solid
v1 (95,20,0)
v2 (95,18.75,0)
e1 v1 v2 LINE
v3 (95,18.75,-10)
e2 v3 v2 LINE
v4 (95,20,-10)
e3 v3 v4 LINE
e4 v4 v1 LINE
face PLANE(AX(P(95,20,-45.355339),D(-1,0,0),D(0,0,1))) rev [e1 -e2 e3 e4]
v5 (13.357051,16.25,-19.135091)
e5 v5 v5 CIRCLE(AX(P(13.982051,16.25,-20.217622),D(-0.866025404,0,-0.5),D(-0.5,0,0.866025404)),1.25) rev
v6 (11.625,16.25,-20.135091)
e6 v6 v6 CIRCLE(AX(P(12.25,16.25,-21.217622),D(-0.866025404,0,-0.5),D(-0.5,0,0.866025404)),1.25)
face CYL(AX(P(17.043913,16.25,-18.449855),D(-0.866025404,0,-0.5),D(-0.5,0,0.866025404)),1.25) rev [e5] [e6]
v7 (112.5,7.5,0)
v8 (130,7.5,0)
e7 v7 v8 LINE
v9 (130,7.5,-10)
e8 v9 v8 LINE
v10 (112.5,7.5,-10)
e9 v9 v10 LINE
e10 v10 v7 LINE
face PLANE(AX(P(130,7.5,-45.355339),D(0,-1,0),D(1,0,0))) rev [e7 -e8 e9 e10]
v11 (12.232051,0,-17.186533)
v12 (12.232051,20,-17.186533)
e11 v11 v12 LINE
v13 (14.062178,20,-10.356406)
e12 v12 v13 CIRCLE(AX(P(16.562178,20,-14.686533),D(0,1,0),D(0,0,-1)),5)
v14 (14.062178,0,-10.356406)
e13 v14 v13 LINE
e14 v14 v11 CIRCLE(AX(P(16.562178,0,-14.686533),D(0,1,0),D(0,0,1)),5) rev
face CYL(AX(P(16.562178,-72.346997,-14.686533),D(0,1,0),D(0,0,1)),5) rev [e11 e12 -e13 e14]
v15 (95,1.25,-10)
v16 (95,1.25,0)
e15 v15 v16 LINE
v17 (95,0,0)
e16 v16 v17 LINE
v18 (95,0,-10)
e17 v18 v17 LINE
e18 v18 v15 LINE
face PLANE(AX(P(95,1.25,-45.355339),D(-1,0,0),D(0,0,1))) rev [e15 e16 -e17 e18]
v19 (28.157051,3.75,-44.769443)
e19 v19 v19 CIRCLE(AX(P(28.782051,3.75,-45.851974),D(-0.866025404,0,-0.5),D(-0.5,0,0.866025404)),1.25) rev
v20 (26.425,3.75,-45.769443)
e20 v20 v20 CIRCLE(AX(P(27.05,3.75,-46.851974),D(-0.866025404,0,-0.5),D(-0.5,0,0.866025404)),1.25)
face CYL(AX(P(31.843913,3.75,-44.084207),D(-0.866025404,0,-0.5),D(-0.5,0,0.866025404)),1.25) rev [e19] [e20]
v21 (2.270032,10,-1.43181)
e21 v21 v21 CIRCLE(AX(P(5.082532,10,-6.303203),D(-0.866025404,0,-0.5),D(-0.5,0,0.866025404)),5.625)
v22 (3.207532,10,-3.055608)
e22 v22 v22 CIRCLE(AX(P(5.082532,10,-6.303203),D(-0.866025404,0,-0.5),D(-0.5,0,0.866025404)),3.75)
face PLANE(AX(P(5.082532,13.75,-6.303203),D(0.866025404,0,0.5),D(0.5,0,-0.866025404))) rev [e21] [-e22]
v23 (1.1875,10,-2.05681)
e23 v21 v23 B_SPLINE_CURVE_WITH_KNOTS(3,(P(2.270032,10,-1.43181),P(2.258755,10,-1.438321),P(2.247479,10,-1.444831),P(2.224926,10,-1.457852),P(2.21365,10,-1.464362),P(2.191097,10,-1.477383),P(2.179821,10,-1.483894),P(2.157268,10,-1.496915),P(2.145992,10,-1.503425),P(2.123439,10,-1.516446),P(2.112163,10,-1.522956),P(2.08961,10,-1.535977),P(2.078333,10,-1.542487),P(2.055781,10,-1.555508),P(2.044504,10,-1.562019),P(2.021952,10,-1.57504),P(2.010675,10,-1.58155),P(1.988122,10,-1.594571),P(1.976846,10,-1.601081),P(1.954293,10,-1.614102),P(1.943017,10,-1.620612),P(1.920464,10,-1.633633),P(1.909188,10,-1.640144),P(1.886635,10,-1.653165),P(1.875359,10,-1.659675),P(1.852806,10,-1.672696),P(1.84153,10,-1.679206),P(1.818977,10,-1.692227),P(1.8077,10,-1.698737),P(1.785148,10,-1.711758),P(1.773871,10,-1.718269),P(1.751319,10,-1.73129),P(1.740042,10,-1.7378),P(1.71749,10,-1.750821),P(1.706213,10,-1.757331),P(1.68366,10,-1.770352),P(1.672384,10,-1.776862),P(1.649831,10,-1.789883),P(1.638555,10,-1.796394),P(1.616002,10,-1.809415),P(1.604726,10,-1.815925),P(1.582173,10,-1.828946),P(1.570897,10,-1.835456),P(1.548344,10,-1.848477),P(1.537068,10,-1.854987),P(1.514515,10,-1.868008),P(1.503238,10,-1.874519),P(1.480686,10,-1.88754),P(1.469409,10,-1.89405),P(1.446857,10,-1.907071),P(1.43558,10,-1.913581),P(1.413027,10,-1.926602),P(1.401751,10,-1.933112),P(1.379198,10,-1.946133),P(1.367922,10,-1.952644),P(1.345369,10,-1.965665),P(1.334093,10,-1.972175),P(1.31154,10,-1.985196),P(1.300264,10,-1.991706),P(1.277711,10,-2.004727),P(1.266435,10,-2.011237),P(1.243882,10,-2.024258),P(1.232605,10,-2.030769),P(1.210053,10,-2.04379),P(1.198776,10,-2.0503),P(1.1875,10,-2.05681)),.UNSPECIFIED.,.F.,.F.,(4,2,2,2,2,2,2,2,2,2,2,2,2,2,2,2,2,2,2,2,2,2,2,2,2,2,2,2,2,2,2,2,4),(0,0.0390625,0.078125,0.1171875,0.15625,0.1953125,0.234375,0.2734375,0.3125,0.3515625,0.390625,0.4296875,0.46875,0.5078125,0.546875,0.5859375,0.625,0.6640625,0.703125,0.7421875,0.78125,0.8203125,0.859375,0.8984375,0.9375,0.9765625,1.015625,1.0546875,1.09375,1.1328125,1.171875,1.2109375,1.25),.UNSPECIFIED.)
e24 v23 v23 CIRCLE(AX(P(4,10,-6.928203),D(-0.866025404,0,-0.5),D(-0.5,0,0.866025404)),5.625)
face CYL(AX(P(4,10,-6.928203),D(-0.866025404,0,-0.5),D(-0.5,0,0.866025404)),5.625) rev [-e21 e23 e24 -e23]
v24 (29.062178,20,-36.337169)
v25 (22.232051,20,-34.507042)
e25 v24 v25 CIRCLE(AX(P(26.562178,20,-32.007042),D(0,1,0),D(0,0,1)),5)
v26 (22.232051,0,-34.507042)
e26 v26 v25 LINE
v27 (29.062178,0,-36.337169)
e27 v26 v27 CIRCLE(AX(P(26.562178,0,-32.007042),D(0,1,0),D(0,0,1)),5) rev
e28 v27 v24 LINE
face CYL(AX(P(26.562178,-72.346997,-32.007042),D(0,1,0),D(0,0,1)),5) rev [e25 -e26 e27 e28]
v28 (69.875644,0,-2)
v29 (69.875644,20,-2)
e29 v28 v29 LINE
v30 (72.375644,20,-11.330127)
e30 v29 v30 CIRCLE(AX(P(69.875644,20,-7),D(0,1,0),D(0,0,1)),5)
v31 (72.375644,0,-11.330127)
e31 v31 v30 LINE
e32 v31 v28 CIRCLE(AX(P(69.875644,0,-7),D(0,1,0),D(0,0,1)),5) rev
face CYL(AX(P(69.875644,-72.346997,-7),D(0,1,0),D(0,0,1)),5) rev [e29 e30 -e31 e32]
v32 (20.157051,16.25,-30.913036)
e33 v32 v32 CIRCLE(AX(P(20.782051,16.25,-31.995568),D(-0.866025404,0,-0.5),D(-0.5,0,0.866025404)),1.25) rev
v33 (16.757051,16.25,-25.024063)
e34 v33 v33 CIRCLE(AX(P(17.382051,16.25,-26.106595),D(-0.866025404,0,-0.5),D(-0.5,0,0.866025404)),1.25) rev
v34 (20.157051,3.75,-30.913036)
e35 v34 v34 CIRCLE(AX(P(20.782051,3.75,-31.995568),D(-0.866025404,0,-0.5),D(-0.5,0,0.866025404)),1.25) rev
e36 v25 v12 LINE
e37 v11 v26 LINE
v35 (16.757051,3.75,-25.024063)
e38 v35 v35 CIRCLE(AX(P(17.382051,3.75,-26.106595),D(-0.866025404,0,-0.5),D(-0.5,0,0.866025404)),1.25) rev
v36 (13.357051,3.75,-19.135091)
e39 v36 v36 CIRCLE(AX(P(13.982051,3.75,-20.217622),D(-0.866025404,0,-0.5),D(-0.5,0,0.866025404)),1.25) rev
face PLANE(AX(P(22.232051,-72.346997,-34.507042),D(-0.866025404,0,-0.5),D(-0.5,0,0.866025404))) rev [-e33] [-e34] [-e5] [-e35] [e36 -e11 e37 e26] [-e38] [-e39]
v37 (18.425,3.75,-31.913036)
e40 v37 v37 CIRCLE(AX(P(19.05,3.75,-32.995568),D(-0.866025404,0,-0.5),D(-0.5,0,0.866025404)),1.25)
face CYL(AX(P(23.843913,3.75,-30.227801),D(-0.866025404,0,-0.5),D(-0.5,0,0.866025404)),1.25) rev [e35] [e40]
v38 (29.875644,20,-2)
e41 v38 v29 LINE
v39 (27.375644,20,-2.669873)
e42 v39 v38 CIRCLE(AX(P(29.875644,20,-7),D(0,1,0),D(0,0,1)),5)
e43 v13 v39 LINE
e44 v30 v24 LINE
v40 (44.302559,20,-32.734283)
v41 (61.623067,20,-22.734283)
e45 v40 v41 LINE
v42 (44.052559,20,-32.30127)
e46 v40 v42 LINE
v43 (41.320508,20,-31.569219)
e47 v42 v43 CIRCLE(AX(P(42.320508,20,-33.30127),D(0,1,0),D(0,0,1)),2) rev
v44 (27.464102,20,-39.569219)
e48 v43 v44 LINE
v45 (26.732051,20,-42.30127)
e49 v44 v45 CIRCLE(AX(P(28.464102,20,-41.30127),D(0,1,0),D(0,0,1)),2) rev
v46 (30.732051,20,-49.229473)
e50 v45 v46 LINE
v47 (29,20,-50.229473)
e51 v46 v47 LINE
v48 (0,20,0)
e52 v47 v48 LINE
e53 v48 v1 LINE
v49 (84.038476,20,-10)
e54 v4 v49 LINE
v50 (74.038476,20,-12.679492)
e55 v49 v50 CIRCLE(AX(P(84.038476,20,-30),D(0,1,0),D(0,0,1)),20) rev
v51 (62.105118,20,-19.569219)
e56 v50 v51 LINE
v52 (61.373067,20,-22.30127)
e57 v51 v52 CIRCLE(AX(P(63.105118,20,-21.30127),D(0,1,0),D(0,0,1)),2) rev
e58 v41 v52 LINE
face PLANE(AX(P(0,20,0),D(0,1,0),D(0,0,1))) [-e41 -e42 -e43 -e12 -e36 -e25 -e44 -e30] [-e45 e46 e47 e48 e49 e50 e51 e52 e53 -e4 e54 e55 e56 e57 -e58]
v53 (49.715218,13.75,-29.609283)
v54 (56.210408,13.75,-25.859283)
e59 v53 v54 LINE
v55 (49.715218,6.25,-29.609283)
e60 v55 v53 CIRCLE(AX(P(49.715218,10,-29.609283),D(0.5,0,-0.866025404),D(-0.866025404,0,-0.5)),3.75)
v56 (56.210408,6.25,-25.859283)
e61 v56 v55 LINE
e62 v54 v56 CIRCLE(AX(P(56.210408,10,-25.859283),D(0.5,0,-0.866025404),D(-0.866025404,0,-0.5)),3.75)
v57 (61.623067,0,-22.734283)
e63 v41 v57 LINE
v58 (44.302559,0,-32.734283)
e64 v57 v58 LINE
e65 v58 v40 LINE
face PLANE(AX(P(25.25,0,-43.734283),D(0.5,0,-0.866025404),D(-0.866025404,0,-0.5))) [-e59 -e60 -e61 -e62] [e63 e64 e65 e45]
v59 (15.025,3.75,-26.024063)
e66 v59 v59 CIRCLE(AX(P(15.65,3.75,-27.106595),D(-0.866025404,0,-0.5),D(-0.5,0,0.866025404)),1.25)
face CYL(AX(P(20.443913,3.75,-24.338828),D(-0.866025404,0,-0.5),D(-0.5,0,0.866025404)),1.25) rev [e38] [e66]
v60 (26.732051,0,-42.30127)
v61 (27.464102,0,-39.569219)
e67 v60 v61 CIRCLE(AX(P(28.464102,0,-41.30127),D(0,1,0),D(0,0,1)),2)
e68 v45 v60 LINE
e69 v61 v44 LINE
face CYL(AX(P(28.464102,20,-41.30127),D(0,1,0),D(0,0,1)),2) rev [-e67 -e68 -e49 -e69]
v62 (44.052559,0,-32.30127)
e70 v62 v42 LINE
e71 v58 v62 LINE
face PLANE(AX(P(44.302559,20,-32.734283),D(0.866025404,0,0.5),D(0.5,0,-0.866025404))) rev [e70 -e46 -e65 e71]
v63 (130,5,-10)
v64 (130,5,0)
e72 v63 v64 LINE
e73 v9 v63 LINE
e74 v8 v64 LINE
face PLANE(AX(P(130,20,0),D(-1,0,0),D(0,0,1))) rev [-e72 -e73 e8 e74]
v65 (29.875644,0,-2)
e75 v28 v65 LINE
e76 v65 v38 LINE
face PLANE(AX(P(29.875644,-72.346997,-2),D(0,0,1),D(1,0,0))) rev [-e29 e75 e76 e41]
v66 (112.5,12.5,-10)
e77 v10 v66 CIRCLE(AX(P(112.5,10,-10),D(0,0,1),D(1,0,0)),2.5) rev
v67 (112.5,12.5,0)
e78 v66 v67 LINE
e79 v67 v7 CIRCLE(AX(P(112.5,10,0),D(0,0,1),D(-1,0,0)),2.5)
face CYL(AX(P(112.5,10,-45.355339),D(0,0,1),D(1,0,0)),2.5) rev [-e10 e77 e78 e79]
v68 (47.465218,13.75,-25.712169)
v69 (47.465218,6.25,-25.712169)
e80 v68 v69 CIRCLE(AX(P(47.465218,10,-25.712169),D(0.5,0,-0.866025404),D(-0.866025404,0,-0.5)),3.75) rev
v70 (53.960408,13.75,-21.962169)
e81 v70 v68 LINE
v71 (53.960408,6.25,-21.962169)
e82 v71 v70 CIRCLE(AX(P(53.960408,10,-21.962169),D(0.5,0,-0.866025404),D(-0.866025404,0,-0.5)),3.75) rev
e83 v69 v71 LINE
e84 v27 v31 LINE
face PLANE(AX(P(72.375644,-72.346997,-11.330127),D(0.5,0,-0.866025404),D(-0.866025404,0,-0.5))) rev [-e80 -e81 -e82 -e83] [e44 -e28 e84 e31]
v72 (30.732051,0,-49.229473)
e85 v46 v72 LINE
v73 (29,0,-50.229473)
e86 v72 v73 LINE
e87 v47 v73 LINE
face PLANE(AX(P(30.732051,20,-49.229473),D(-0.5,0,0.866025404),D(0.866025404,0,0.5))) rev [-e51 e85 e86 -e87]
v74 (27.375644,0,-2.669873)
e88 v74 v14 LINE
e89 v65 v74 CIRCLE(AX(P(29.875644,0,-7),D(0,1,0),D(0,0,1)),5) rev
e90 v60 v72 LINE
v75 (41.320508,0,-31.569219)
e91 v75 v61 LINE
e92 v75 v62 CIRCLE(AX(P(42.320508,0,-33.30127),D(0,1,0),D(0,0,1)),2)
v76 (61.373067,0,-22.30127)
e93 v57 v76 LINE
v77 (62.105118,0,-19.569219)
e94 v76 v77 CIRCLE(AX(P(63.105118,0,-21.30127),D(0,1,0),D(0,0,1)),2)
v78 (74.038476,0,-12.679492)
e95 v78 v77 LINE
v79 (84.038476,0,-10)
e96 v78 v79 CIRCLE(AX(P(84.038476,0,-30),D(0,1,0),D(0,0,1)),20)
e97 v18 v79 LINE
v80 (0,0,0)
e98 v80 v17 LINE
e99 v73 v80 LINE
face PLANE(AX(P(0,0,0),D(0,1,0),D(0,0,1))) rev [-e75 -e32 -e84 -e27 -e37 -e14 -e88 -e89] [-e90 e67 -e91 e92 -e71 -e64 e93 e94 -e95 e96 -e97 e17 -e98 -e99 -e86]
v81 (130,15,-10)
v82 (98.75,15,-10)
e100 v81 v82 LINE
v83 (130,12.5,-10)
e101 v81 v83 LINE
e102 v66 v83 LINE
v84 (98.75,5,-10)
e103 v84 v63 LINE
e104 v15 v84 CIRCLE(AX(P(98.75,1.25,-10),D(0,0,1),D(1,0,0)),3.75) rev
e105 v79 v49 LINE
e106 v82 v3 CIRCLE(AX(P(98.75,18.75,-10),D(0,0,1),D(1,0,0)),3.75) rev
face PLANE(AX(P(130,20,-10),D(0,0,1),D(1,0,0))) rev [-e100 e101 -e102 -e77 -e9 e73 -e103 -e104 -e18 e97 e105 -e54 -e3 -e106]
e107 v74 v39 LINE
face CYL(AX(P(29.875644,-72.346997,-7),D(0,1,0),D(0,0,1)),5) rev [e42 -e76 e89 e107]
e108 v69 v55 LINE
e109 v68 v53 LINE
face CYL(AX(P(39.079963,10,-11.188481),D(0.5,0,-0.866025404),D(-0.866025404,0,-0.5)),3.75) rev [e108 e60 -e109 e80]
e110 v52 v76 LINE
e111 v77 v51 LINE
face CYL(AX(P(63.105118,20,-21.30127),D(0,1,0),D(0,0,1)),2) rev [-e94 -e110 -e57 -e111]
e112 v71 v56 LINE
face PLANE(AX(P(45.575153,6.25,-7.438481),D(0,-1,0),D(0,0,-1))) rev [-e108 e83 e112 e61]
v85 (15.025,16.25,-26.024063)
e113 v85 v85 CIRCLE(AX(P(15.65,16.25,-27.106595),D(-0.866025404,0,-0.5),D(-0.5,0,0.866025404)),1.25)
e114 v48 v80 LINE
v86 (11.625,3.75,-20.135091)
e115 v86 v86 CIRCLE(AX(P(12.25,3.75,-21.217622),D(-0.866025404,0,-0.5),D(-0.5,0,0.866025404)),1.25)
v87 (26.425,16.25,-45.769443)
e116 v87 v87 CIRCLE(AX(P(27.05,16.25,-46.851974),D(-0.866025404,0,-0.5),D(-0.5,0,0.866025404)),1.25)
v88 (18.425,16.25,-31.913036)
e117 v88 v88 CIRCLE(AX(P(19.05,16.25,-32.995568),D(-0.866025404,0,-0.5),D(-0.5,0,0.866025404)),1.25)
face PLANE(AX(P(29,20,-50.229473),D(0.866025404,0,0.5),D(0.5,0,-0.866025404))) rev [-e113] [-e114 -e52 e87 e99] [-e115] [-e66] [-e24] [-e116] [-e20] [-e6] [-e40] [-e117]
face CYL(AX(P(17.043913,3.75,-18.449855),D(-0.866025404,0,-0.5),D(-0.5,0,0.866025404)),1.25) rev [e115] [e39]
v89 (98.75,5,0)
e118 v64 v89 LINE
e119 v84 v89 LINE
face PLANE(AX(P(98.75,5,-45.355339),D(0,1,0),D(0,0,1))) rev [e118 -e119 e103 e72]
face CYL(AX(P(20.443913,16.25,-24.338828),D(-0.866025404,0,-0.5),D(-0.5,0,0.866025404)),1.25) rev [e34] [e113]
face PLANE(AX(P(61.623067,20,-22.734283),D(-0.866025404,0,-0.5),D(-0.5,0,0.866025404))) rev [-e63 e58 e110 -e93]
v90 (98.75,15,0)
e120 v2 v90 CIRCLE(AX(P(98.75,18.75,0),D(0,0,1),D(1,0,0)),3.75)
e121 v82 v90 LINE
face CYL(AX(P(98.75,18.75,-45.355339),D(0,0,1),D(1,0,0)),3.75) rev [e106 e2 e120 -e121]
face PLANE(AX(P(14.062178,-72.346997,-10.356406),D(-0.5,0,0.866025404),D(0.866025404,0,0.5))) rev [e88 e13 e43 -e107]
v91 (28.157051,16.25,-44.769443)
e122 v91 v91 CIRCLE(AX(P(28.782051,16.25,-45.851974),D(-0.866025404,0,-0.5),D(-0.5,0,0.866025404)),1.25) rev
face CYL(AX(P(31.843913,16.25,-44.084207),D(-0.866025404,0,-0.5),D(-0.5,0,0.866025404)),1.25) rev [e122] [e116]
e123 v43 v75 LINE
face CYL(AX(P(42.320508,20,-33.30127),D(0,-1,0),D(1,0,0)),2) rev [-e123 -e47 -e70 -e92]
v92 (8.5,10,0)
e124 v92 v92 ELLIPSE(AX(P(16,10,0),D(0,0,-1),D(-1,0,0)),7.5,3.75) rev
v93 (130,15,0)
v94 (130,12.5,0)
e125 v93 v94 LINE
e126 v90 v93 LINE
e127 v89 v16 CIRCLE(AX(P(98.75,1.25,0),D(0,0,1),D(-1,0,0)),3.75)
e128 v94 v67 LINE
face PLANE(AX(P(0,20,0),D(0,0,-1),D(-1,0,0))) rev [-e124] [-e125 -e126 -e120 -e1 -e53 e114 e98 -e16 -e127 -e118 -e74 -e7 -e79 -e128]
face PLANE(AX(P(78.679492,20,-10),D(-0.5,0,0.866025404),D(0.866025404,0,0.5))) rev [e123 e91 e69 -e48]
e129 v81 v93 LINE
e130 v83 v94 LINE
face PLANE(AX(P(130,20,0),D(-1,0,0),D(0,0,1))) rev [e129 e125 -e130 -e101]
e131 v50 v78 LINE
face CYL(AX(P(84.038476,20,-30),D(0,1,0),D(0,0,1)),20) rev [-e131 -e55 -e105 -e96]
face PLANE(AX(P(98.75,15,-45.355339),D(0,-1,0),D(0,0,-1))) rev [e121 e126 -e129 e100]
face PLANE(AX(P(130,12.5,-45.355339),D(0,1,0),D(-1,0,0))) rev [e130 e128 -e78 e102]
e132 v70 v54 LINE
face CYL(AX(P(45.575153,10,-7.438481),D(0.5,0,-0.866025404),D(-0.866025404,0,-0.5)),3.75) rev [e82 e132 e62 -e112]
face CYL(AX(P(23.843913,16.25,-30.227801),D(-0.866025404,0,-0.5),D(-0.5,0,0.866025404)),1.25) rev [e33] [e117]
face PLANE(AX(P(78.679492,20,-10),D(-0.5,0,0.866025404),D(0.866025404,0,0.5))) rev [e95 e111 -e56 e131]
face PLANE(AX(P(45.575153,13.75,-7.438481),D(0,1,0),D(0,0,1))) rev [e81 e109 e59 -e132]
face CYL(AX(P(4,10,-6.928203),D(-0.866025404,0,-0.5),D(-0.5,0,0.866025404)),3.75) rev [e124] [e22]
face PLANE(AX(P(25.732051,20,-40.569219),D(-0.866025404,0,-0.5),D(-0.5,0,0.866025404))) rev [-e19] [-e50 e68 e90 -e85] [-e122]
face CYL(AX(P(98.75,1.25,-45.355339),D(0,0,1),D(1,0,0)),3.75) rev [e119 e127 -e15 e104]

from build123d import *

# Parameters (mm, degrees)
BOSS_EXTRUDE1_DEPTH                     = 20
CUT_EXTRUDE1_DEPTH                      = 20
CBORE_FOR_M5_HEX_HEAD_BOLT1_D           = 7.5
CBORE_FOR_M5_HEX_HEAD_BOLT1_DEPTH       = 112.583668517
CBORE_FOR_M5_HEX_HEAD_BOLT1_CBORE_D     = 11.25
CBORE_FOR_M5_HEX_HEAD_BOLT1_CBORE_DEPTH = 1.25
CBORE_FOR_M5_HEX_HEAD_BOLT1_TIP         = 2.253227321
CUT_EXTRUDE2_DEPTH                      = 10
SKETCH6_W                               = 20
SKETCH6_H                               = 20
BOSS_EXTRUDE2_DEPTH                     = 2.5
FILLET1_R                               = 2
FILLET2_R                               = 20
CUT_EXTRUDE3_DEPTH                      = 4.5
HOLE1_OUTLINE_R                         = 1.25
HOLE1_DEPTH                             = 2
LPATTERN1_COUNT                         = 3
LPATTERN1_PITCH                         = 6.8
LPATTERN1_COUNT_DIR2                    = 2
LPATTERN1_PITCH_DIR2                    = 12.5
LPATTERN2_COUNT                         = 2
LPATTERN2_PITCH                         = 29.6
LPATTERN2_COUNT_DIR2                    = 2
LPATTERN2_PITCH_DIR2                    = 12.5


# Read off the part's stored shape, not the designer's step: Hole1
with BuildPart() as part:
    # Sketch1 → Boss-Extrude1 (new body)
    with BuildSketch(Plane(origin=(0, 0, 0), x_dir=(1, 0, 0), z_dir=(0, 1, 0))):
        Polygon((29, 50.229473419), (0, 0), (130, 0), (130, 10), (78.679491924, 10), (25.732050808, 40.569219382), (30.732050808, 49.229473419), align=None)
    extrude(amount=BOSS_EXTRUDE1_DEPTH)

    # Sketch2 → Cut-Extrude1 (cut)
    with BuildSketch(Plane(origin=(0, 20, 0), x_dir=(1, 0, 0), z_dir=(0, 1, 0))):
        with BuildLine():
            Line((29.875644347, 2), (69.875644347, 2))
            ThreePointArc((69.875644347, 2), (74.705273478, 5.705904774), (72.375644347, 11.330127019))
            Line((72.375644347, 11.330127019), (29.062177826, 36.337168574))
            ThreePointArc((29.062177826, 36.337168574), (25.268082601, 36.836670687), (22.232050808, 34.507041555))
            Line((22.232050808, 34.507041555), (12.232050808, 17.186533479))
            ThreePointArc((12.232050808, 17.186533479), (11.732548695, 13.392438254), (14.062177826, 10.356406461))
            Line((14.062177826, 10.356406461), (27.375644347, 2.669872981))
            ThreePointArc((27.375644347, 2.669872981), (28.581549122, 2.170370869), (29.875644347, 2))
        make_face()
    extrude(amount=-CUT_EXTRUDE1_DEPTH, mode=Mode.SUBTRACT)

    # CBORE for M5 Hex Head Bolt1
    with Locations(Plane(origin=(0, 0, 0), x_dir=(-0.5000000000000042, 0, 0.8660254037844363), z_dir=(-0.8660254037844362, 0, -0.5000000000000041))):
        with Locations((-8, 10)):
            CounterBoreHole(CBORE_FOR_M5_HEX_HEAD_BOLT1_D / 2, CBORE_FOR_M5_HEX_HEAD_BOLT1_CBORE_D / 2, CBORE_FOR_M5_HEX_HEAD_BOLT1_CBORE_DEPTH, depth=CBORE_FOR_M5_HEX_HEAD_BOLT1_DEPTH)
            with Locations((0, 0, -(CBORE_FOR_M5_HEX_HEAD_BOLT1_DEPTH + CBORE_FOR_M5_HEX_HEAD_BOLT1_TIP / 2))):  # 118° drill point
                Cone(0, CBORE_FOR_M5_HEX_HEAD_BOLT1_D / 2, CBORE_FOR_M5_HEX_HEAD_BOLT1_TIP, mode=Mode.SUBTRACT)

    # Sketch5 → Cut-Extrude2 (cut)
    with BuildSketch(Plane.XY):
        with BuildLine():
            Line((95, 20), (130, 20))
            Line((130, 20), (130, 15))
            Line((130, 15), (98.75, 15))
            ThreePointArc((98.75, 15), (96.098349571, 16.098349571), (95, 18.75))
            Line((95, 18.75), (95, 20))
        make_face()
        with BuildLine():
            Line((95, 0), (130, 0))
            Line((130, 0), (130, 5))
            Line((130, 5), (98.75, 5))
            ThreePointArc((98.75, 5), (96.098349571, 3.901650429), (95, 1.25))
            Line((95, 1.25), (95, 0))
        make_face()
        with BuildLine():
            Line((130, 12.5), (112.5, 12.5))
            ThreePointArc((112.5, 12.5), (110, 10), (112.5, 7.5))
            Line((112.5, 7.5), (130, 7.5))
            Line((130, 7.5), (130, 12.5))
        make_face()
    extrude(amount=-CUT_EXTRUDE2_DEPTH, mode=Mode.SUBTRACT)

    # Sketch6 → Boss-Extrude2 (add)
    with BuildSketch(Plane(origin=(24, 0, -41.569219382), x_dir=(-0.8660254037844363, 0, -0.5000000000000042), z_dir=(0.5000000000000042, 0, -0.8660254037844363))):
        with Locations((-32, 10)):
            Rectangle(SKETCH6_W, SKETCH6_H)
    extrude(amount=BOSS_EXTRUDE2_DEPTH)

    # Fillet1
    fillet1_edges = [part.edges().sort_by_distance(p)[0] for p in [
        (60.373066959, 10, -20.569219382),
        (43.052558883, 10, -30.569219382),
        (25.732050808, 10, -40.569219382),
    ]]
    fillet(fillet1_edges, radius=FILLET1_R)

    # Fillet2
    fillet2_edges = [part.edges().sort_by_distance(p)[0] for p in [
        (78.679491924, 10, -10),
    ]]
    fillet(fillet2_edges, radius=FILLET2_R)

    # Sketch7 → Cut-Extrude3 (cut)
    with BuildSketch(Plane(origin=(25.25, 0, -43.734282891), x_dir=(-0.8660254037844363, 0, -0.5000000000000042), z_dir=(0.5000000000000042, 0, -0.8660254037844363))):
        with BuildLine():
            Line((-35.75, 13.75), (-28.25, 13.75))
            ThreePointArc((-28.25, 13.75), (-24.5, 10), (-28.25, 6.25))
            Line((-28.25, 6.25), (-35.75, 6.25))
            ThreePointArc((-35.75, 6.25), (-39.5, 10), (-35.75, 13.75))
        make_face()
    extrude(amount=-CUT_EXTRUDE3_DEPTH, mode=Mode.SUBTRACT)

    # Hole1 outline → Hole1 (cut)
    with BuildSketch(Plane(origin=(0, 0, 0), x_dir=(0.500000000000004, 0, -0.8660254037844363), z_dir=(0.8660254037844363, 0, 0.5000000000000042))):
        with Locations((24.5, 16.25)):
            Circle(HOLE1_OUTLINE_R)
    hole1 = extrude(amount=HOLE1_DEPTH, mode=Mode.SUBTRACT)

    # LPattern1: Hole1 3 × 2
    with Locations(*[Vector(0.5000000000000041, 0, -0.8660254037844363) * (i * LPATTERN1_PITCH) + Vector(0, -1, 0) * (j * LPATTERN1_PITCH_DIR2) for i in range(LPATTERN1_COUNT) for j in range(LPATTERN1_COUNT_DIR2) if (i, j) != (0, 0)]):
        add(hole1, mode=Mode.SUBTRACT)

    # LPattern2: Hole1 2 × 2, 1 skipped
    with Locations(*[Vector(0.5000000000000041, 0, -0.8660254037844363) * (i * LPATTERN2_PITCH) + Vector(0, -1, 0) * (j * LPATTERN2_PITCH_DIR2) for i in range(LPATTERN2_COUNT) for j in range(LPATTERN2_COUNT_DIR2) if (i, j) not in ((0, 0), (0, 1))]):
        add(hole1, mode=Mode.SUBTRACT)


solid = part.part
